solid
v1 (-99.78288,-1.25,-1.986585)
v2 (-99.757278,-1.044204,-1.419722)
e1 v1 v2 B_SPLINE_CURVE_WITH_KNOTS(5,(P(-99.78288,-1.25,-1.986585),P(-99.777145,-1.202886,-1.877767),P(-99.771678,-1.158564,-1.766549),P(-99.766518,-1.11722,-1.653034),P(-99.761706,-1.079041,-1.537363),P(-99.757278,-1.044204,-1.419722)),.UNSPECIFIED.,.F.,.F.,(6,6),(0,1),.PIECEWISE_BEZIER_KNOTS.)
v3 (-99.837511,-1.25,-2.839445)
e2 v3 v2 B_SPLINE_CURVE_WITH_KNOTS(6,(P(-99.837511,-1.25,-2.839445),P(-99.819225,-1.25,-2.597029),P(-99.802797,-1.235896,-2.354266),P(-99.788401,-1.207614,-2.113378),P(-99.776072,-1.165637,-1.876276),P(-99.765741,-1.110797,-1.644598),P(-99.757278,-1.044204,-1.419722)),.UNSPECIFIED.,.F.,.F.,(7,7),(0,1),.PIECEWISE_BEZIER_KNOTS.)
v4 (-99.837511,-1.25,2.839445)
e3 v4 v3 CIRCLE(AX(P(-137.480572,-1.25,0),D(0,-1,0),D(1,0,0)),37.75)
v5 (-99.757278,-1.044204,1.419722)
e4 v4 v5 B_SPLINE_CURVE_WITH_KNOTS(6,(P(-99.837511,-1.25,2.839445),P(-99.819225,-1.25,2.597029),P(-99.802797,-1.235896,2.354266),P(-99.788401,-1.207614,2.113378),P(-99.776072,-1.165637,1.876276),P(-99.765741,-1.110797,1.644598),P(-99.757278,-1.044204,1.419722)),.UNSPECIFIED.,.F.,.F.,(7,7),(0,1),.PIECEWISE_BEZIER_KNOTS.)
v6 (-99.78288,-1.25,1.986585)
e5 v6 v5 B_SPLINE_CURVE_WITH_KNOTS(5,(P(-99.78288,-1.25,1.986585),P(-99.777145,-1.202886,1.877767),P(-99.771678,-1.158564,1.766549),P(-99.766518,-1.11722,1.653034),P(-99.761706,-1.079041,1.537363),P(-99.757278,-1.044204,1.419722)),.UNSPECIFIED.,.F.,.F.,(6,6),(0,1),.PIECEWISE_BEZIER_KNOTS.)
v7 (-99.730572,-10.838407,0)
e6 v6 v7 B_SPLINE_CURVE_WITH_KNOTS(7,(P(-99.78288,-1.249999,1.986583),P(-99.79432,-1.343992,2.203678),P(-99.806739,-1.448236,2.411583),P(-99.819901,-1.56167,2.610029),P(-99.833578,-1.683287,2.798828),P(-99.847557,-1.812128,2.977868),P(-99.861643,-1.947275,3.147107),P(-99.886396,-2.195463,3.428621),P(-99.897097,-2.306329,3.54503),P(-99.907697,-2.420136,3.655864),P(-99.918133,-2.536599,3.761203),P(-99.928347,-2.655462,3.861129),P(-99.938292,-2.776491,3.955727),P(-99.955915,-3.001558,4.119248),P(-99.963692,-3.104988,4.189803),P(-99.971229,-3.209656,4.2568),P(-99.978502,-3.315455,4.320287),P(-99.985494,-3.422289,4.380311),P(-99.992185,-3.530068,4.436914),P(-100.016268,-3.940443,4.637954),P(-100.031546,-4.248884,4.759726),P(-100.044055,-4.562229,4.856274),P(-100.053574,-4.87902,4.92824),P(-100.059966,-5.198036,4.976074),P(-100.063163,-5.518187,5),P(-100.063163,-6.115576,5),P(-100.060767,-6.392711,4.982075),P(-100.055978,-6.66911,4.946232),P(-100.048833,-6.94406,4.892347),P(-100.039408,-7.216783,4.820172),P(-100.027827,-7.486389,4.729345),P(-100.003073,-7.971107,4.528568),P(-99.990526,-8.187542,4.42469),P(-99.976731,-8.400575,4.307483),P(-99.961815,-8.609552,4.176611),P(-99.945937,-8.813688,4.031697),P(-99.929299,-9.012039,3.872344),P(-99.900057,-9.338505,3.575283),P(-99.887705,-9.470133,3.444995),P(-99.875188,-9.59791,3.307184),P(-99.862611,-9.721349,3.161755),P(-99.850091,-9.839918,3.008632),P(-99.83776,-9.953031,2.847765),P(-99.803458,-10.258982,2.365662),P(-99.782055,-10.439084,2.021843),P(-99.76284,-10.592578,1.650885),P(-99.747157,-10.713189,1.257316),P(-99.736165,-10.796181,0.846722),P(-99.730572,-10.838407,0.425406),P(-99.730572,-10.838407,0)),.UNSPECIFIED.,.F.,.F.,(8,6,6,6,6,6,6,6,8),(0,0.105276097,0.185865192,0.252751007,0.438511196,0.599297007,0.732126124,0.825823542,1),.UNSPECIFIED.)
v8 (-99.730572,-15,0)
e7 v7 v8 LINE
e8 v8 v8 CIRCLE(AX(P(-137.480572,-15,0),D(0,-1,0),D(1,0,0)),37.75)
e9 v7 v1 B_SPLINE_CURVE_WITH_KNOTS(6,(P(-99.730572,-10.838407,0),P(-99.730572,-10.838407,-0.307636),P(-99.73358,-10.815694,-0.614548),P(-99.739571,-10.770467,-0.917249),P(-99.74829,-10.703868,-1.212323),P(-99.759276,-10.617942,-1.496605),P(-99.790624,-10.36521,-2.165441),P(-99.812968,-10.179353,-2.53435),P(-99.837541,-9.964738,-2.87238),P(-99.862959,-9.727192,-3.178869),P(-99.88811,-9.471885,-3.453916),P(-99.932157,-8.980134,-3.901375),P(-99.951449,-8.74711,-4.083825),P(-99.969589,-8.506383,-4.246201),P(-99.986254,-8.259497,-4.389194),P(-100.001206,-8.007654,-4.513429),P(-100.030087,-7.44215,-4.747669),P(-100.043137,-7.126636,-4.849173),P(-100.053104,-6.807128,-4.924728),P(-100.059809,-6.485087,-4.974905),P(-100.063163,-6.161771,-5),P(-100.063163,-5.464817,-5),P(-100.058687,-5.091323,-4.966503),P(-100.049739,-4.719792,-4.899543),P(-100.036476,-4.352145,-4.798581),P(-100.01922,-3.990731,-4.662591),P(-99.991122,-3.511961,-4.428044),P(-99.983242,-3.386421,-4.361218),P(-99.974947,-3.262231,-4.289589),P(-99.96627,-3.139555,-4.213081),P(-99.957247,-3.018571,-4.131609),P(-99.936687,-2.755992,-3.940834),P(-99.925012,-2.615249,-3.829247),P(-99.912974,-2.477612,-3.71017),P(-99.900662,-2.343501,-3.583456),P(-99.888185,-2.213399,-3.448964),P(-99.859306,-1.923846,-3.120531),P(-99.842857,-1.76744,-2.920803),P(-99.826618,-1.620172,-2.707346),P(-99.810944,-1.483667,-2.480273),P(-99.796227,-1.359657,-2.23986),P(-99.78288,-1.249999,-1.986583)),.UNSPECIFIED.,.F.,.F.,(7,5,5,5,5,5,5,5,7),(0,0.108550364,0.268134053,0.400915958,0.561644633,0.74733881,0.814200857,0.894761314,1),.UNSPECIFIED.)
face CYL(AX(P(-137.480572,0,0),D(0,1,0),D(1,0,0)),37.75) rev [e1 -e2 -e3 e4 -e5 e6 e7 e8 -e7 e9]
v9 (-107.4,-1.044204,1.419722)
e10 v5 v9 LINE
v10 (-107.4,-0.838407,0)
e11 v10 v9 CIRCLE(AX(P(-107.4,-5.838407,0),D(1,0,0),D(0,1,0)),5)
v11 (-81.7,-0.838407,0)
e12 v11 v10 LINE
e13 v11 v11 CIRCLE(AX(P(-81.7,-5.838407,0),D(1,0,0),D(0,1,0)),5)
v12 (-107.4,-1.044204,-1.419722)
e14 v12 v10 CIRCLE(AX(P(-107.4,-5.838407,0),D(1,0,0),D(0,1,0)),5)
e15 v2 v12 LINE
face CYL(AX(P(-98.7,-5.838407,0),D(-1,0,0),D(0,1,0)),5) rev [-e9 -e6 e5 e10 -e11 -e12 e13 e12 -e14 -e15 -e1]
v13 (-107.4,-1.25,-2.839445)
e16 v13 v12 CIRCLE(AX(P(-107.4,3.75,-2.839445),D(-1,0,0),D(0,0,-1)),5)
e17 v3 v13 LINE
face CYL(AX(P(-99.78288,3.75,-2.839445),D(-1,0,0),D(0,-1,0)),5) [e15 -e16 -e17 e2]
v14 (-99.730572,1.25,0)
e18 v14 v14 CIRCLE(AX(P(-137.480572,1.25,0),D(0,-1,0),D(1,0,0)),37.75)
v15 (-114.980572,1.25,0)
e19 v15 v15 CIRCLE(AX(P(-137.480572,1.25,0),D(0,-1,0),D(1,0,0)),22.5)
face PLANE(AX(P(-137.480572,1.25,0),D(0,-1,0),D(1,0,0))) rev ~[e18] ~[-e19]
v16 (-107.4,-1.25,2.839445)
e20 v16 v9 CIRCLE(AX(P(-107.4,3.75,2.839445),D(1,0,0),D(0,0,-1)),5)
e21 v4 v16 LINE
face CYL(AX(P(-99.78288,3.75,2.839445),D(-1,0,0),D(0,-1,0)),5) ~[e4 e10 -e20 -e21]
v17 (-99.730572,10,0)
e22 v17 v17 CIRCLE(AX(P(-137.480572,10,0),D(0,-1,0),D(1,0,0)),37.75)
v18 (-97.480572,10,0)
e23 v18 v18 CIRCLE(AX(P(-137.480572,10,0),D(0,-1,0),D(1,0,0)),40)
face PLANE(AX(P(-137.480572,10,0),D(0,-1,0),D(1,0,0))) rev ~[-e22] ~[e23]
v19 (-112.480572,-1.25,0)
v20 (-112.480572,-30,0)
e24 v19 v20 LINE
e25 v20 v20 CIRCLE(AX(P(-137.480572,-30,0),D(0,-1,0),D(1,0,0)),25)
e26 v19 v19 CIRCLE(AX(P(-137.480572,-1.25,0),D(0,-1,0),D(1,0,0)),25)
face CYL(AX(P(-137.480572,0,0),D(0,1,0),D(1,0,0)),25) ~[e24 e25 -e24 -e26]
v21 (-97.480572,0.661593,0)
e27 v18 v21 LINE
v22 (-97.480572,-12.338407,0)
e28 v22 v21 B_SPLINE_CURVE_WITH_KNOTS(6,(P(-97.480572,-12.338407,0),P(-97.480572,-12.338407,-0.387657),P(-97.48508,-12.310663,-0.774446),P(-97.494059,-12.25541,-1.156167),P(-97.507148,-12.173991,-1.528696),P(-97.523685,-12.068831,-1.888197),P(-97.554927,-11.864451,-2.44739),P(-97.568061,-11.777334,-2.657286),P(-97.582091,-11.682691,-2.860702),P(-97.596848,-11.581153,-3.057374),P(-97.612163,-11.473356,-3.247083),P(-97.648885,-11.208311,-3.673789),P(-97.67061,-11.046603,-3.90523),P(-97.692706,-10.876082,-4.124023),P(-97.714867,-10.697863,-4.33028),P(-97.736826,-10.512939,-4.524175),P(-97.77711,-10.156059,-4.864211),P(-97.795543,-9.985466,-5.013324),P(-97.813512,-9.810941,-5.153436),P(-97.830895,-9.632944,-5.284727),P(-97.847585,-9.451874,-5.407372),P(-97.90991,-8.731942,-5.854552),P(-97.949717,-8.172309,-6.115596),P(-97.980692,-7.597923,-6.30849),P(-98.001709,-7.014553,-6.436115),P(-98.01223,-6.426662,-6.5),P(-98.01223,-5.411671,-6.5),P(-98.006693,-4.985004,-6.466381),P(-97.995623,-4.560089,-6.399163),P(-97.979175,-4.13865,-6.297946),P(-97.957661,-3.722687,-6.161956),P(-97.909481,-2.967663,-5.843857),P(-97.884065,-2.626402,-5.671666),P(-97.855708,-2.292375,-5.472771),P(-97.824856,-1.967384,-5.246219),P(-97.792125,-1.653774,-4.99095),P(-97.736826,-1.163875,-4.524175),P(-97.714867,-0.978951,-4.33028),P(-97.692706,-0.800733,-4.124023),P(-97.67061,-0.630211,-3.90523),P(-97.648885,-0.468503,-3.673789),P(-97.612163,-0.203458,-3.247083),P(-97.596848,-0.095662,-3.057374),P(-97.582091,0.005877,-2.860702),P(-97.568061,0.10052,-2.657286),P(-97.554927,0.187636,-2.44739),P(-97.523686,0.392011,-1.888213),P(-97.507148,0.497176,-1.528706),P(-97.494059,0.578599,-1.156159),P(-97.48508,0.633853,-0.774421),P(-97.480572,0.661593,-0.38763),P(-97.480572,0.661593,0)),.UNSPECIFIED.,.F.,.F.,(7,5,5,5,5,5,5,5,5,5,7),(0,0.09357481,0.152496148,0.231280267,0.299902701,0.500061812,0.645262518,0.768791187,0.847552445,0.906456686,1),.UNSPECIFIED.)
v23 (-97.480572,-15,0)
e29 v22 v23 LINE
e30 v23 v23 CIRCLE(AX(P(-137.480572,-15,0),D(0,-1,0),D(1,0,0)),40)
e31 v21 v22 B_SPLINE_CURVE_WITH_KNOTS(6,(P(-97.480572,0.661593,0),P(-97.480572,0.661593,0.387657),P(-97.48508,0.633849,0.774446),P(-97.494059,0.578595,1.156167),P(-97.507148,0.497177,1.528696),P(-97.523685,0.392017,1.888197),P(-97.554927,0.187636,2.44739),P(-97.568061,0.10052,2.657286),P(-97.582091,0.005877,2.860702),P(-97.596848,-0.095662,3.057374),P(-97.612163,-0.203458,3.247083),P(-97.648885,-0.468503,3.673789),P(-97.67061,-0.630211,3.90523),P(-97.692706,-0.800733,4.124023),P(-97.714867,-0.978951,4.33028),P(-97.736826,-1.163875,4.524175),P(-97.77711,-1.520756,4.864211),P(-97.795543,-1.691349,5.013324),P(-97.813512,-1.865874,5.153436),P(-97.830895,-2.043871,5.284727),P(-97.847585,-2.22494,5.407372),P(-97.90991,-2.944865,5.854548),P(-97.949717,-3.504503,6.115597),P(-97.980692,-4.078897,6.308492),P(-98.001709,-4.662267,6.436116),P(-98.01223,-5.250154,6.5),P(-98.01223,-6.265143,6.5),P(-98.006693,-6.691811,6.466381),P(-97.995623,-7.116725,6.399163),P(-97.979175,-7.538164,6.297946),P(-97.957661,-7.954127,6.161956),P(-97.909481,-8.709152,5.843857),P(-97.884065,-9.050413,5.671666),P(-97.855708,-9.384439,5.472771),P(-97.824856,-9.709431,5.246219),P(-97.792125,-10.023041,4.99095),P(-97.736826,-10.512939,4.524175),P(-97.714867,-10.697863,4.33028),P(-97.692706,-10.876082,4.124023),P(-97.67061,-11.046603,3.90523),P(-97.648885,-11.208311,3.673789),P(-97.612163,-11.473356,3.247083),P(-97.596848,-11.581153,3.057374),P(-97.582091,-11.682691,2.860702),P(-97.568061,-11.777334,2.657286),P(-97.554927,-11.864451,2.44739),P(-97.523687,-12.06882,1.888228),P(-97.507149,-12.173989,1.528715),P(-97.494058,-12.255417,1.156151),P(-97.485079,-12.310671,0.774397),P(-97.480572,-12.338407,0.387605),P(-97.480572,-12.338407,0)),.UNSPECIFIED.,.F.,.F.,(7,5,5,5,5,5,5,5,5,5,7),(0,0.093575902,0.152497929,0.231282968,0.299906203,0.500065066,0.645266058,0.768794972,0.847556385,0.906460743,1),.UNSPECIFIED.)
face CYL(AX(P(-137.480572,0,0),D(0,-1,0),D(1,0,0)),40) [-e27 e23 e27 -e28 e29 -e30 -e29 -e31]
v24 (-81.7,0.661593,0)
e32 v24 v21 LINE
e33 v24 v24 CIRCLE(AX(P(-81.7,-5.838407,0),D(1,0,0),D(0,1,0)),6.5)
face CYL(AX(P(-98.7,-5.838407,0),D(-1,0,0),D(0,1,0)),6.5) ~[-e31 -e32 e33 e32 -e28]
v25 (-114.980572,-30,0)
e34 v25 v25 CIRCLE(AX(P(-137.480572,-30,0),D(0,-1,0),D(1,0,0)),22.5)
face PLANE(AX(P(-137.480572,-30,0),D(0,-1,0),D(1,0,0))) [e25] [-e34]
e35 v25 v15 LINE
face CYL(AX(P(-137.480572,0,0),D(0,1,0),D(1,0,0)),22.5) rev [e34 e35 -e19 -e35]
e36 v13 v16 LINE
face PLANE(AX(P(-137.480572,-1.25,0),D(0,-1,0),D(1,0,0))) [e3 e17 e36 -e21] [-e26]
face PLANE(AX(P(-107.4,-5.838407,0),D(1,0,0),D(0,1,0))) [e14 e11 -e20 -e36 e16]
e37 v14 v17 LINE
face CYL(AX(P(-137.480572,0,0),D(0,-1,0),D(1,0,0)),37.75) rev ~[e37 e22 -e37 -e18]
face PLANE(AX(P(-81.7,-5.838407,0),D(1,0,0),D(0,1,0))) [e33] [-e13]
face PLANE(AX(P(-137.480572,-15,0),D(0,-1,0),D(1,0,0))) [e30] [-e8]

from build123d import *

# Parameters (mm, degrees)
F0_R      = 40
F0_R_2    = 37.75
F1_DEPTH  = 15
F2_DEPTH  = 10
F0_R_3    = 25
F3_DEPTH  = 1.25
F0_R_4    = 22.5
F4_DEPTH  = 30
F5_DEPTH  = 1.25
F7_R      = 5
F8_DEPTH  = 39
F9_R      = 5
F11_R     = 6.5
F11_R_2   = 5
F12_DEPTH = 17
F13_DEPTH = 10


with BuildPart() as f1:
    # F0 (on Front) → F1 (new body)
    with BuildSketch(Plane.XZ):
        with Locations((-137.480571866, 0)):
            Circle(F0_R)
        with Locations((-137.480571866, 0)):
            Circle(F0_R_2, mode=Mode.SUBTRACT)
    extrude(amount=F1_DEPTH)

    # F2 (add): a face of the model
    f2_faces = [f1.faces().sort_by_distance(p)[0] for p in [
        (-176.3492010161, 0, 0),
    ]]
    extrude(f2_faces, amount=F2_DEPTH)

    # F0 (on Front) → F3 (join, symmetric)
    with BuildSketch(Plane.XZ):
        with Locations((-137.480571866, 0)):
            Circle(F0_R_2)
        with Locations((-137.480571866, 0)):
            Circle(F0_R_3, mode=Mode.SUBTRACT)
    extrude(amount=F3_DEPTH, both=True)

    # F0 (on Front) → F4 (join)
    with BuildSketch(Plane.XZ):
        with Locations((-137.480571866, 0)):
            Circle(F0_R_3)
        with Locations((-137.480571866, 0)):
            Circle(F0_R_4, mode=Mode.SUBTRACT)
    extrude(amount=F4_DEPTH)

    # F5 (add): a face of the model
    f5_faces = [f1.faces().sort_by_distance(p)[0] for p in [
        (-161.7734650848, 0, 0),
    ]]
    extrude(f5_faces, amount=F5_DEPTH)

    # F7 (on offset) → F8 (cut)
    with BuildSketch(Plane.YZ.offset(-107.4)):
        with Locations((-5.8384072036, 0)):
            Circle(F7_R)
    extrude(amount=F8_DEPTH, mode=Mode.SUBTRACT)

    # F9
    f9_edges = [f1.edges().sort_by_distance(p)[0] for p in [
        (-103.59144, -1.25, 1.986585),
        (-103.59144, -1.25, -1.986585),
    ]]
    fillet(f9_edges, radius=F9_R)

    # F11 (on offset) → F12 (join)
    with BuildSketch(Plane.YZ.offset(-98.7)):
        with Locations((-5.8384072036, 0)):
            Circle(F11_R)
        with Locations((-5.8384072036, 0)):
            Circle(F11_R_2, mode=Mode.SUBTRACT)
    extrude(amount=F12_DEPTH)

    # F11 (on offset) → F13 (join)
    with BuildSketch(Plane.YZ.offset(-98.7)):
        with Locations((-5.8384072036, 0)):
            Circle(F11_R)
        with Locations((-5.8384072036, 0)):
            Circle(F11_R_2, mode=Mode.SUBTRACT)
    extrude(amount=F13_DEPTH)


solid = f1.part
